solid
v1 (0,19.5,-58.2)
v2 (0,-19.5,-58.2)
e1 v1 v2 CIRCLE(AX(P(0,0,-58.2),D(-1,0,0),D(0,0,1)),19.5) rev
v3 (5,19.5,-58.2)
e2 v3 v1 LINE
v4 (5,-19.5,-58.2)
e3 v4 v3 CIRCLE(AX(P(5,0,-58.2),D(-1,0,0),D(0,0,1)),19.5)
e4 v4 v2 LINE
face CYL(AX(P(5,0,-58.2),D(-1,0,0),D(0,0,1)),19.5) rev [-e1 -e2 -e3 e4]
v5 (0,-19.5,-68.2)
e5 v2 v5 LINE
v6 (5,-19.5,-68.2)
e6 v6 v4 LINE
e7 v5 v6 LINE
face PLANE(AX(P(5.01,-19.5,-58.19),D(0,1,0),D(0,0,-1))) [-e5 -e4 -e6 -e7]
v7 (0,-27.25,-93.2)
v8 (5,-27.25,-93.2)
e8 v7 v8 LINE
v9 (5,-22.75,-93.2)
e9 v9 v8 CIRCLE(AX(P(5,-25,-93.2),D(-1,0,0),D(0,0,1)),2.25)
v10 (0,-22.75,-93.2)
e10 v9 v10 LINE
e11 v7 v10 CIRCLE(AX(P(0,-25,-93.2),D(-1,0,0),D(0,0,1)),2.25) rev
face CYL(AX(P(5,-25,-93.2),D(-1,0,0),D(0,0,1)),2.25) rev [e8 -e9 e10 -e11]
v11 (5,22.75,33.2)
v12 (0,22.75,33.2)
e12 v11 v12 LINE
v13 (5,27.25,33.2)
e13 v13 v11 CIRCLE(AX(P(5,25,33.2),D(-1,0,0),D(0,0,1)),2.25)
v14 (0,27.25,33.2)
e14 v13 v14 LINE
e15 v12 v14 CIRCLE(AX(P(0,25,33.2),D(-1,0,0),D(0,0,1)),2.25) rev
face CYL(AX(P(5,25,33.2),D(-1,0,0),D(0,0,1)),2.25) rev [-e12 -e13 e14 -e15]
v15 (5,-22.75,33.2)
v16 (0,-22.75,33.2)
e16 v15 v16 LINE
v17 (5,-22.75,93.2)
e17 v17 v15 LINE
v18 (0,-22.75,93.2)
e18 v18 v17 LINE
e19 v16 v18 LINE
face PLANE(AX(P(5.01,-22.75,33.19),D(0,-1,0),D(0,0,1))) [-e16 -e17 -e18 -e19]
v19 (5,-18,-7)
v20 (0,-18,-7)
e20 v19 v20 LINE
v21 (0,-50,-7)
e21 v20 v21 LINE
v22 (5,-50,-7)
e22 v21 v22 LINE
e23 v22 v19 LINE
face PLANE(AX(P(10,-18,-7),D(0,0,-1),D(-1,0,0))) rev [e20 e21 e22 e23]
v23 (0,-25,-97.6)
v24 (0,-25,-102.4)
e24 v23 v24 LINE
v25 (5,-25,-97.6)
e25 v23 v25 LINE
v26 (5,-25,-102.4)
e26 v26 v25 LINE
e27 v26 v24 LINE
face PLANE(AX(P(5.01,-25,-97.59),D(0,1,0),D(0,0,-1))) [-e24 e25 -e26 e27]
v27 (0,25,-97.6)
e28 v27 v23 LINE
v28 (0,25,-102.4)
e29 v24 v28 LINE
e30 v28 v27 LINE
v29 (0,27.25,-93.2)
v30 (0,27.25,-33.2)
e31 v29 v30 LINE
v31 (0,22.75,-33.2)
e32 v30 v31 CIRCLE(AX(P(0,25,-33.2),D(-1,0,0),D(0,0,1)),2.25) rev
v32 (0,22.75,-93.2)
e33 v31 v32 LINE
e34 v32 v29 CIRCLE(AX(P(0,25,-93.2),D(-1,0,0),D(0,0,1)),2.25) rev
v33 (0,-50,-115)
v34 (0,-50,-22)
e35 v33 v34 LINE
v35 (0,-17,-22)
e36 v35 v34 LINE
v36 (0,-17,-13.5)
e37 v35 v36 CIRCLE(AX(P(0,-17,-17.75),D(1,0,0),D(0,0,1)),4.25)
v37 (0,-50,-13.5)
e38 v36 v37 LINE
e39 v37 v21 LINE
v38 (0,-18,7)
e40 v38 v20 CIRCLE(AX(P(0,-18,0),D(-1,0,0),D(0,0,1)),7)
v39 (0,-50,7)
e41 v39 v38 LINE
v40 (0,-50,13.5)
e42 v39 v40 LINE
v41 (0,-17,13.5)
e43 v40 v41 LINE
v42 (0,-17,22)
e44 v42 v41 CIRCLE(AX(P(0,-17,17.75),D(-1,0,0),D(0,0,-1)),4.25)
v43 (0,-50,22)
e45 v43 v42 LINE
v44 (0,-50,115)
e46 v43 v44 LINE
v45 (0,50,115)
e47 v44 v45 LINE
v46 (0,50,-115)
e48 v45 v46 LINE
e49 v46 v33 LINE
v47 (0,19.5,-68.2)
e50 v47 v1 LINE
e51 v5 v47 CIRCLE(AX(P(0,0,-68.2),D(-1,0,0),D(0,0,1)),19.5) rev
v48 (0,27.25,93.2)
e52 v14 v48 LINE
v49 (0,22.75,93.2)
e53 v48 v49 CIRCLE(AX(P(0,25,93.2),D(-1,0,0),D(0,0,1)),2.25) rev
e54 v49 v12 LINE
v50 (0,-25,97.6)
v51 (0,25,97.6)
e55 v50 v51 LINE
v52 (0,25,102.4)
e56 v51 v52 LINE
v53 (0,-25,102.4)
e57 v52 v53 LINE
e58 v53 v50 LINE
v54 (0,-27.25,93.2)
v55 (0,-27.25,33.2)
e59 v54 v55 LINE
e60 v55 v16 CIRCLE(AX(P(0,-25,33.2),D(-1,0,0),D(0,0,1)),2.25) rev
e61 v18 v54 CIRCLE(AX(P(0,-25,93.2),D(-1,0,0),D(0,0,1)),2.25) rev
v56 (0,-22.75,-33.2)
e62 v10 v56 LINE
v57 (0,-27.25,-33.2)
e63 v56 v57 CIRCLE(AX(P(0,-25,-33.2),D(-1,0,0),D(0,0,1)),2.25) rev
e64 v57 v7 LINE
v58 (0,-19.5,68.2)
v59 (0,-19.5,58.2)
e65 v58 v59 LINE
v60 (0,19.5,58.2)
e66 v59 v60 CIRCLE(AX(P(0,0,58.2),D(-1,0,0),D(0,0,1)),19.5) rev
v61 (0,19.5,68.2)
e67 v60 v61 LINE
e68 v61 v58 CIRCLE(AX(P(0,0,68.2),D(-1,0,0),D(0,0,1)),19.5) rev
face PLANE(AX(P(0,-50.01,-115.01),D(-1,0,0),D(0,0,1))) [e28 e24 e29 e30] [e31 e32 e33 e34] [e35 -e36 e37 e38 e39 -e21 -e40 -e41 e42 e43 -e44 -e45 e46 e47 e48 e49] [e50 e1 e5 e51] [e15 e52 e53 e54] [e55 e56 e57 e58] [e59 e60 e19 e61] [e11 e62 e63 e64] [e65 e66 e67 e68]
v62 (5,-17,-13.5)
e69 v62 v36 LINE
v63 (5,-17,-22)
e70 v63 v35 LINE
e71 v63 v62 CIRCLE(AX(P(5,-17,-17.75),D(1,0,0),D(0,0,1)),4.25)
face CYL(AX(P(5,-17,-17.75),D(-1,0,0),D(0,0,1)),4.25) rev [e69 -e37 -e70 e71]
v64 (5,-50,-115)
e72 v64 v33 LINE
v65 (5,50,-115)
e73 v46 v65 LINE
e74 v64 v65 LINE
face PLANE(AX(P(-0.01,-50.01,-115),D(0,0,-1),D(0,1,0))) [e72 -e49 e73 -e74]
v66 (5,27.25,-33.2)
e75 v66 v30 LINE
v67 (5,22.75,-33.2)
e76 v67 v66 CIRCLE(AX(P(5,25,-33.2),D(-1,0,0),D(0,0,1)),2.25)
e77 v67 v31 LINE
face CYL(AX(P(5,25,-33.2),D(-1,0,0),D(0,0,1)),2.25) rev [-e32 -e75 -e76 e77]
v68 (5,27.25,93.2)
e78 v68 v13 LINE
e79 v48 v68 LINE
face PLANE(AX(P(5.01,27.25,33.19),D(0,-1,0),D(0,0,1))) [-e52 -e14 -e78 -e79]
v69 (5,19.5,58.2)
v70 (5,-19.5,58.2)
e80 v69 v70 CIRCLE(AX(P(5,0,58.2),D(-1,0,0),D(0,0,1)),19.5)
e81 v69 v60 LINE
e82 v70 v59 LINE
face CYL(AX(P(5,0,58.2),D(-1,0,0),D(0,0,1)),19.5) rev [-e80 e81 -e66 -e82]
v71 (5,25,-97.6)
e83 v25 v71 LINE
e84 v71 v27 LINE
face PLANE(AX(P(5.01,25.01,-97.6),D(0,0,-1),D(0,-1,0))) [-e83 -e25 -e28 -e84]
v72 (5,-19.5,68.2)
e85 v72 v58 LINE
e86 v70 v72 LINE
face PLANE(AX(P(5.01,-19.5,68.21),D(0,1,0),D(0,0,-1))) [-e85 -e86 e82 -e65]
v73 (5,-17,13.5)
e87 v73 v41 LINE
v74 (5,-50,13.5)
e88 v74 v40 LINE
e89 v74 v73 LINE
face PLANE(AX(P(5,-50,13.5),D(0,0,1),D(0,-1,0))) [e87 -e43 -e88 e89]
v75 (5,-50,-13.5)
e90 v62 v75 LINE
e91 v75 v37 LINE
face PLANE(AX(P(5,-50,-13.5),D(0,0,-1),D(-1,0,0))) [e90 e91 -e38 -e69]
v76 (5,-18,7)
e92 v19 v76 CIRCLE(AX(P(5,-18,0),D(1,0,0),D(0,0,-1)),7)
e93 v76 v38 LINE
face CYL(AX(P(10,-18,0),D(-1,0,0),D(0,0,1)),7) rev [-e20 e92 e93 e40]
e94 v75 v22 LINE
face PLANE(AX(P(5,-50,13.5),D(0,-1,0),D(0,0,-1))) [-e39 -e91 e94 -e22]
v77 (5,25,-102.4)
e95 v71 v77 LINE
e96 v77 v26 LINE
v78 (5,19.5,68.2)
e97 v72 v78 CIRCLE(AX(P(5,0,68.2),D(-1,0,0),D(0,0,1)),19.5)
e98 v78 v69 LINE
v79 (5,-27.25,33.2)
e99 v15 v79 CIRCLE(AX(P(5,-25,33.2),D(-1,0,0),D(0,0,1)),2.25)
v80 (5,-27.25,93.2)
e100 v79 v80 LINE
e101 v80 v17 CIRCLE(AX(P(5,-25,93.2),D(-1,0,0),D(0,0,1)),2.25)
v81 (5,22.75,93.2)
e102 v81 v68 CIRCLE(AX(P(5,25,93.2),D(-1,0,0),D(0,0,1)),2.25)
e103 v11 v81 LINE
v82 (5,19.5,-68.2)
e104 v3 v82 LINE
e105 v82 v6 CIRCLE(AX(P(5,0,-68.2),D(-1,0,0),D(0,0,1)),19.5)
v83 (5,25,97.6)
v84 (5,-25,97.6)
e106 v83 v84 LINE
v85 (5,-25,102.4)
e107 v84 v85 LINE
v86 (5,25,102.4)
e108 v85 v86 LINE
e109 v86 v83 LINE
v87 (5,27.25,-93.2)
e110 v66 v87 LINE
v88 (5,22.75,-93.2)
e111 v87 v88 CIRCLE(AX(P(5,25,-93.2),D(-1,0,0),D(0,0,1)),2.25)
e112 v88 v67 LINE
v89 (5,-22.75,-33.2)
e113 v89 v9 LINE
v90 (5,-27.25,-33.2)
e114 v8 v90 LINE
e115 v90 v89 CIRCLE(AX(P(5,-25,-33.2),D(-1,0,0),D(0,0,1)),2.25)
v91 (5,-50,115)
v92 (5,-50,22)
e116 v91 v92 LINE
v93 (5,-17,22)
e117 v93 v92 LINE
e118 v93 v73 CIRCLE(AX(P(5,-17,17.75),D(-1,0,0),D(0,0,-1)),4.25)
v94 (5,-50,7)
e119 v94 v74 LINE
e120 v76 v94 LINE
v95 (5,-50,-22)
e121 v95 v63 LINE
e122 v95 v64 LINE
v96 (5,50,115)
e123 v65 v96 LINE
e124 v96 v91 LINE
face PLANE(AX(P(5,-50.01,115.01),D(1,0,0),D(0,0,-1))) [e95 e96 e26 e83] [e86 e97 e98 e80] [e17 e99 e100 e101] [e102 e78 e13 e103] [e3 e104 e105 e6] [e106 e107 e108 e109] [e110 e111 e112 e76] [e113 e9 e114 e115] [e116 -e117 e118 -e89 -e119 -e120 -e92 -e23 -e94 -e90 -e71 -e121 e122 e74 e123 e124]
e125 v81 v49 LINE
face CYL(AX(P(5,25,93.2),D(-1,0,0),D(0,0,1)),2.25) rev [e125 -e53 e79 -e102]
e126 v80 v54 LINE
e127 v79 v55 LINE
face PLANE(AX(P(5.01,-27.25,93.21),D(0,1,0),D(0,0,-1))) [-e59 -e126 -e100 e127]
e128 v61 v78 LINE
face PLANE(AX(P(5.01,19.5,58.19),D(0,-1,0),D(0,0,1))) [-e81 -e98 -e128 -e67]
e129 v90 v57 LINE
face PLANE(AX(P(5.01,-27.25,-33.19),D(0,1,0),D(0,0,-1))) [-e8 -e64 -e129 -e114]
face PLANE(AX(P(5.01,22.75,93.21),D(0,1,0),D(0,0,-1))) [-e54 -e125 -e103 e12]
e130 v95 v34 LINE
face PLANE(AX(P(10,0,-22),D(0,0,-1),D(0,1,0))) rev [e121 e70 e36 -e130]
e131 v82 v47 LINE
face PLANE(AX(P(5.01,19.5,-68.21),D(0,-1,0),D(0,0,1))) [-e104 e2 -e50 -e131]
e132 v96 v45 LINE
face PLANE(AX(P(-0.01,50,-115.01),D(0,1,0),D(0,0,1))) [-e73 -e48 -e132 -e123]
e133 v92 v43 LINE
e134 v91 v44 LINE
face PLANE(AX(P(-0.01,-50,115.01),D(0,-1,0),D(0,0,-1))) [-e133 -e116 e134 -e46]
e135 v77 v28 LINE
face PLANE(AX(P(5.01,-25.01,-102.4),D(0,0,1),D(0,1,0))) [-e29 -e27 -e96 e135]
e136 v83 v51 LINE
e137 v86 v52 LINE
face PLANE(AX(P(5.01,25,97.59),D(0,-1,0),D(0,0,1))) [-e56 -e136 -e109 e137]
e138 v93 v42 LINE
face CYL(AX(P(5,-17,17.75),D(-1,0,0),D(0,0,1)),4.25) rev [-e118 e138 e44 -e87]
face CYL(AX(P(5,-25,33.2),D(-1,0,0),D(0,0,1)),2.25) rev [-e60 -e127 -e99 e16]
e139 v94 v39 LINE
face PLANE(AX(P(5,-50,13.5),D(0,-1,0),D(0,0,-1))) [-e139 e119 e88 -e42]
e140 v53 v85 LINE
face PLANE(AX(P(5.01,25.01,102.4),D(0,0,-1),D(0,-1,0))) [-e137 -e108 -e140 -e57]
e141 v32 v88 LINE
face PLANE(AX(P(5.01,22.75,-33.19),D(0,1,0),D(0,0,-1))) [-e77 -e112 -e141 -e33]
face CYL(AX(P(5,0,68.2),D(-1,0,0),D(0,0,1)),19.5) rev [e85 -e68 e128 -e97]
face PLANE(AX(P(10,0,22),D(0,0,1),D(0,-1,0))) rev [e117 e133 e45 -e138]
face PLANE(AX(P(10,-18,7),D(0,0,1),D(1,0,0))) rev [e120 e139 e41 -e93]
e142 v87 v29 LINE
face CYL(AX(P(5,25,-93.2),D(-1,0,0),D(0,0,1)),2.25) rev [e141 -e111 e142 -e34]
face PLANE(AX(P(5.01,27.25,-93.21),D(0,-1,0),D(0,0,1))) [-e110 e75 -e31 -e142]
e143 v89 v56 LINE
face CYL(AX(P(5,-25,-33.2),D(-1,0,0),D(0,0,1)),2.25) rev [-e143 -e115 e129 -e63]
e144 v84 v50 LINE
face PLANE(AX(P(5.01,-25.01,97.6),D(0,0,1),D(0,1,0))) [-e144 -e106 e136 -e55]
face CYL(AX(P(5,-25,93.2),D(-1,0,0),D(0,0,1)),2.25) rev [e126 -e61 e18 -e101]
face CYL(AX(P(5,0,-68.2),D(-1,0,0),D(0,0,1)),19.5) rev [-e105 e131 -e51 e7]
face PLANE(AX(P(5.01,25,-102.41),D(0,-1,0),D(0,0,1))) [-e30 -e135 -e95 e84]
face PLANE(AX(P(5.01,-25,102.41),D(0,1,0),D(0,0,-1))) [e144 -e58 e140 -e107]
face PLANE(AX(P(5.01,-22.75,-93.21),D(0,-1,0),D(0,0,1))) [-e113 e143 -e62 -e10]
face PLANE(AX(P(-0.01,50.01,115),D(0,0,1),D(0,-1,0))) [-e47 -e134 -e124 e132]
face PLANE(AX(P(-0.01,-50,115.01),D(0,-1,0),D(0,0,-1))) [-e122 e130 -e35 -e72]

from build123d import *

# Parameters (mm, degrees)
CUT_EXTRUDE1_START     = -5
CUT_EXTRUDE1_OUTLINE_W = 4.8
CUT_EXTRUDE1_OUTLINE_H = 50
CUT_EXTRUDE1_DEPTH     = 5
BOSS_EXTRUDE1_START    = -5
BOSS_EXTRUDE1_DEPTH    = 5
BOSS_EXTRUDE2_START    = -5
BOSS_EXTRUDE2_DEPTH    = 5
CUT_EXTRUDE2_DEPTH     = 10
BOSS_EXTRUDE3_START    = -5
BOSS_EXTRUDE3_DEPTH    = 5
BOSS_EXTRUDE4_START    = -5
BOSS_EXTRUDE4_DEPTH    = 5


with BuildPart() as part:
    # Cut-Extrude1: read off the stored shape, not the designer's step
    # Cut-Extrude1 outline → Cut-Extrude1 (new body)
    with BuildSketch(Plane.ZY.offset(CUT_EXTRUDE1_START)):
        with BuildLine():
            Line((22, -25), (47, -50))
            Line((47, -50), (115, -50))
            Line((115, -50), (115, 50))
            Line((115, 50), (-115, 50))
            Line((-115, 50), (-115, -50))
            Line((-115, -50), (-47, -50))
            Line((-47, -50), (-22, -25))
            Line((-22, -25), (-22, 0))
            ThreePointArc((-22, 0), (-16.382917933, 14.683323874), (-2.4, 21.868699093))
            Line((-2.4, 21.868699093), (-2.4, 25))
            Line((-2.4, 25), (2.4, 25))
            Line((2.4, 25), (2.4, 21.868699093))
            ThreePointArc((2.4, 21.868699093), (16.382917933, 14.683323874), (22, 0))
            Line((22, 0), (22, -25))
        make_face()
        with BuildLine():
            ThreePointArc((-33.2, -22.75), (-30.95, -25), (-33.2, -27.25))
            Line((-33.2, -27.25), (-93.2, -27.25))
            ThreePointArc((-93.2, -27.25), (-95.45, -25), (-93.2, -22.75))
            Line((-93.2, -22.75), (-33.2, -22.75))
        make_face(mode=Mode.SUBTRACT)
        with BuildLine():
            ThreePointArc((33.2, -27.25), (30.95, -25), (33.2, -22.75))
            Line((33.2, -22.75), (93.2, -22.75))
            ThreePointArc((93.2, -22.75), (95.45, -25), (93.2, -27.25))
            Line((93.2, -27.25), (33.2, -27.25))
        make_face(mode=Mode.SUBTRACT)
        with Locations((-100, 0)):
            Rectangle(CUT_EXTRUDE1_OUTLINE_W, CUT_EXTRUDE1_OUTLINE_H, mode=Mode.SUBTRACT)
        with BuildLine():
            ThreePointArc((-58.2, 19.5), (-38.7, 0), (-58.2, -19.5))
            Line((-58.2, -19.5), (-68.2, -19.5))
            ThreePointArc((-68.2, -19.5), (-87.7, 0), (-68.2, 19.5))
            Line((-68.2, 19.5), (-58.2, 19.5))
        make_face(mode=Mode.SUBTRACT)
        with BuildLine():
            ThreePointArc((-33.2, 27.25), (-30.95, 25), (-33.2, 22.75))
            Line((-33.2, 22.75), (-93.2, 22.75))
            ThreePointArc((-93.2, 22.75), (-95.45, 25), (-93.2, 27.25))
            Line((-93.2, 27.25), (-33.2, 27.25))
        make_face(mode=Mode.SUBTRACT)
        with BuildLine():
            ThreePointArc((58.2, -19.5), (38.7, 0), (58.2, 19.5))
            Line((58.2, 19.5), (68.2, 19.5))
            ThreePointArc((68.2, 19.5), (87.7, 0), (68.2, -19.5))
            Line((68.2, -19.5), (58.2, -19.5))
        make_face(mode=Mode.SUBTRACT)
        with Locations((100, 0)):
            Rectangle(CUT_EXTRUDE1_OUTLINE_W, CUT_EXTRUDE1_OUTLINE_H, mode=Mode.SUBTRACT)
        with BuildLine():
            ThreePointArc((33.2, 22.75), (30.95, 25), (33.2, 27.25))
            Line((33.2, 27.25), (93.2, 27.25))
            ThreePointArc((93.2, 27.25), (95.45, 25), (93.2, 22.75))
            Line((93.2, 22.75), (33.2, 22.75))
        make_face(mode=Mode.SUBTRACT)
    extrude(amount=CUT_EXTRUDE1_DEPTH)

    # Sketch2 → Boss-Extrude1 (add)
    with BuildSketch(Plane.ZY.offset(BOSS_EXTRUDE1_START)):
        with BuildLine():
            Line((2.4, 25), (-2.4, 25))
            Line((-2.4, 25), (-2.4, 21.868699093))
            ThreePointArc((-2.4, 21.868699093), (0, 22), (2.4, 21.868699093))
            Line((2.4, 21.868699093), (2.4, 25))
        make_face()
    extrude(amount=BOSS_EXTRUDE1_DEPTH)

    # Sketch3 → Boss-Extrude2 (add)
    with BuildSketch(Plane.ZY.offset(BOSS_EXTRUDE2_START)):
        with BuildLine():
            Line((13.5, -50), (13.5, 17.370952766))
            ThreePointArc((13.5, 17.370952766), (0, 22), (-13.5, 17.370952766))
            Line((-13.5, 17.370952766), (-13.5, -50))
            Line((-13.5, -50), (13.5, -50))
        make_face()
    extrude(amount=BOSS_EXTRUDE2_DEPTH)

    # Sketch4 → Cut-Extrude2 (cut)
    with BuildSketch(Plane.ZY):
        with BuildLine():
            Line((7, -18), (7, -50))
            ThreePointArc((7, -50), (0, -57), (-7, -50))
            Line((-7, -50), (-7, -18))
            ThreePointArc((-7, -18), (0, -11), (7, -18))
        make_face()
    extrude(amount=-CUT_EXTRUDE2_DEPTH, mode=Mode.SUBTRACT)

    # Sketch5 → Boss-Extrude3 (add)
    with BuildSketch(Plane.ZY.offset(BOSS_EXTRUDE3_START)):
        Polygon((-22, -25), (-22, -50), (-47, -50), align=None)
        with BuildLine():
            Line((-13.5, 17.370952766), (-13.5, 0))
            ThreePointArc((-13.5, 0), (-17.75, 4.25), (-22, 0))
            ThreePointArc((-22, 0), (-19.761072845, 9.669539803), (-13.5, 17.370952766))
        make_face()
    boss_extrude3 = extrude(amount=BOSS_EXTRUDE3_DEPTH)

    # Sketch6 → Boss-Extrude4 (add)
    with BuildSketch(Plane.ZY.offset(BOSS_EXTRUDE4_START)):
        with BuildLine():
            Line((-13.5, 0), (-13.5, -17))
            ThreePointArc((-13.5, -17), (-17.75, -12.75), (-22, -17))
            Line((-22, -17), (-22, 0))
            ThreePointArc((-22, 0), (-17.75, 4.25), (-13.5, 0))
        make_face()
    boss_extrude4 = extrude(amount=BOSS_EXTRUDE4_DEPTH)

    # Mirror1: Boss-Extrude3, Boss-Extrude4 across plane
    add(boss_extrude3.mirror(Plane.XY))
    add(boss_extrude4.mirror(Plane.XY))


solid = part.part
